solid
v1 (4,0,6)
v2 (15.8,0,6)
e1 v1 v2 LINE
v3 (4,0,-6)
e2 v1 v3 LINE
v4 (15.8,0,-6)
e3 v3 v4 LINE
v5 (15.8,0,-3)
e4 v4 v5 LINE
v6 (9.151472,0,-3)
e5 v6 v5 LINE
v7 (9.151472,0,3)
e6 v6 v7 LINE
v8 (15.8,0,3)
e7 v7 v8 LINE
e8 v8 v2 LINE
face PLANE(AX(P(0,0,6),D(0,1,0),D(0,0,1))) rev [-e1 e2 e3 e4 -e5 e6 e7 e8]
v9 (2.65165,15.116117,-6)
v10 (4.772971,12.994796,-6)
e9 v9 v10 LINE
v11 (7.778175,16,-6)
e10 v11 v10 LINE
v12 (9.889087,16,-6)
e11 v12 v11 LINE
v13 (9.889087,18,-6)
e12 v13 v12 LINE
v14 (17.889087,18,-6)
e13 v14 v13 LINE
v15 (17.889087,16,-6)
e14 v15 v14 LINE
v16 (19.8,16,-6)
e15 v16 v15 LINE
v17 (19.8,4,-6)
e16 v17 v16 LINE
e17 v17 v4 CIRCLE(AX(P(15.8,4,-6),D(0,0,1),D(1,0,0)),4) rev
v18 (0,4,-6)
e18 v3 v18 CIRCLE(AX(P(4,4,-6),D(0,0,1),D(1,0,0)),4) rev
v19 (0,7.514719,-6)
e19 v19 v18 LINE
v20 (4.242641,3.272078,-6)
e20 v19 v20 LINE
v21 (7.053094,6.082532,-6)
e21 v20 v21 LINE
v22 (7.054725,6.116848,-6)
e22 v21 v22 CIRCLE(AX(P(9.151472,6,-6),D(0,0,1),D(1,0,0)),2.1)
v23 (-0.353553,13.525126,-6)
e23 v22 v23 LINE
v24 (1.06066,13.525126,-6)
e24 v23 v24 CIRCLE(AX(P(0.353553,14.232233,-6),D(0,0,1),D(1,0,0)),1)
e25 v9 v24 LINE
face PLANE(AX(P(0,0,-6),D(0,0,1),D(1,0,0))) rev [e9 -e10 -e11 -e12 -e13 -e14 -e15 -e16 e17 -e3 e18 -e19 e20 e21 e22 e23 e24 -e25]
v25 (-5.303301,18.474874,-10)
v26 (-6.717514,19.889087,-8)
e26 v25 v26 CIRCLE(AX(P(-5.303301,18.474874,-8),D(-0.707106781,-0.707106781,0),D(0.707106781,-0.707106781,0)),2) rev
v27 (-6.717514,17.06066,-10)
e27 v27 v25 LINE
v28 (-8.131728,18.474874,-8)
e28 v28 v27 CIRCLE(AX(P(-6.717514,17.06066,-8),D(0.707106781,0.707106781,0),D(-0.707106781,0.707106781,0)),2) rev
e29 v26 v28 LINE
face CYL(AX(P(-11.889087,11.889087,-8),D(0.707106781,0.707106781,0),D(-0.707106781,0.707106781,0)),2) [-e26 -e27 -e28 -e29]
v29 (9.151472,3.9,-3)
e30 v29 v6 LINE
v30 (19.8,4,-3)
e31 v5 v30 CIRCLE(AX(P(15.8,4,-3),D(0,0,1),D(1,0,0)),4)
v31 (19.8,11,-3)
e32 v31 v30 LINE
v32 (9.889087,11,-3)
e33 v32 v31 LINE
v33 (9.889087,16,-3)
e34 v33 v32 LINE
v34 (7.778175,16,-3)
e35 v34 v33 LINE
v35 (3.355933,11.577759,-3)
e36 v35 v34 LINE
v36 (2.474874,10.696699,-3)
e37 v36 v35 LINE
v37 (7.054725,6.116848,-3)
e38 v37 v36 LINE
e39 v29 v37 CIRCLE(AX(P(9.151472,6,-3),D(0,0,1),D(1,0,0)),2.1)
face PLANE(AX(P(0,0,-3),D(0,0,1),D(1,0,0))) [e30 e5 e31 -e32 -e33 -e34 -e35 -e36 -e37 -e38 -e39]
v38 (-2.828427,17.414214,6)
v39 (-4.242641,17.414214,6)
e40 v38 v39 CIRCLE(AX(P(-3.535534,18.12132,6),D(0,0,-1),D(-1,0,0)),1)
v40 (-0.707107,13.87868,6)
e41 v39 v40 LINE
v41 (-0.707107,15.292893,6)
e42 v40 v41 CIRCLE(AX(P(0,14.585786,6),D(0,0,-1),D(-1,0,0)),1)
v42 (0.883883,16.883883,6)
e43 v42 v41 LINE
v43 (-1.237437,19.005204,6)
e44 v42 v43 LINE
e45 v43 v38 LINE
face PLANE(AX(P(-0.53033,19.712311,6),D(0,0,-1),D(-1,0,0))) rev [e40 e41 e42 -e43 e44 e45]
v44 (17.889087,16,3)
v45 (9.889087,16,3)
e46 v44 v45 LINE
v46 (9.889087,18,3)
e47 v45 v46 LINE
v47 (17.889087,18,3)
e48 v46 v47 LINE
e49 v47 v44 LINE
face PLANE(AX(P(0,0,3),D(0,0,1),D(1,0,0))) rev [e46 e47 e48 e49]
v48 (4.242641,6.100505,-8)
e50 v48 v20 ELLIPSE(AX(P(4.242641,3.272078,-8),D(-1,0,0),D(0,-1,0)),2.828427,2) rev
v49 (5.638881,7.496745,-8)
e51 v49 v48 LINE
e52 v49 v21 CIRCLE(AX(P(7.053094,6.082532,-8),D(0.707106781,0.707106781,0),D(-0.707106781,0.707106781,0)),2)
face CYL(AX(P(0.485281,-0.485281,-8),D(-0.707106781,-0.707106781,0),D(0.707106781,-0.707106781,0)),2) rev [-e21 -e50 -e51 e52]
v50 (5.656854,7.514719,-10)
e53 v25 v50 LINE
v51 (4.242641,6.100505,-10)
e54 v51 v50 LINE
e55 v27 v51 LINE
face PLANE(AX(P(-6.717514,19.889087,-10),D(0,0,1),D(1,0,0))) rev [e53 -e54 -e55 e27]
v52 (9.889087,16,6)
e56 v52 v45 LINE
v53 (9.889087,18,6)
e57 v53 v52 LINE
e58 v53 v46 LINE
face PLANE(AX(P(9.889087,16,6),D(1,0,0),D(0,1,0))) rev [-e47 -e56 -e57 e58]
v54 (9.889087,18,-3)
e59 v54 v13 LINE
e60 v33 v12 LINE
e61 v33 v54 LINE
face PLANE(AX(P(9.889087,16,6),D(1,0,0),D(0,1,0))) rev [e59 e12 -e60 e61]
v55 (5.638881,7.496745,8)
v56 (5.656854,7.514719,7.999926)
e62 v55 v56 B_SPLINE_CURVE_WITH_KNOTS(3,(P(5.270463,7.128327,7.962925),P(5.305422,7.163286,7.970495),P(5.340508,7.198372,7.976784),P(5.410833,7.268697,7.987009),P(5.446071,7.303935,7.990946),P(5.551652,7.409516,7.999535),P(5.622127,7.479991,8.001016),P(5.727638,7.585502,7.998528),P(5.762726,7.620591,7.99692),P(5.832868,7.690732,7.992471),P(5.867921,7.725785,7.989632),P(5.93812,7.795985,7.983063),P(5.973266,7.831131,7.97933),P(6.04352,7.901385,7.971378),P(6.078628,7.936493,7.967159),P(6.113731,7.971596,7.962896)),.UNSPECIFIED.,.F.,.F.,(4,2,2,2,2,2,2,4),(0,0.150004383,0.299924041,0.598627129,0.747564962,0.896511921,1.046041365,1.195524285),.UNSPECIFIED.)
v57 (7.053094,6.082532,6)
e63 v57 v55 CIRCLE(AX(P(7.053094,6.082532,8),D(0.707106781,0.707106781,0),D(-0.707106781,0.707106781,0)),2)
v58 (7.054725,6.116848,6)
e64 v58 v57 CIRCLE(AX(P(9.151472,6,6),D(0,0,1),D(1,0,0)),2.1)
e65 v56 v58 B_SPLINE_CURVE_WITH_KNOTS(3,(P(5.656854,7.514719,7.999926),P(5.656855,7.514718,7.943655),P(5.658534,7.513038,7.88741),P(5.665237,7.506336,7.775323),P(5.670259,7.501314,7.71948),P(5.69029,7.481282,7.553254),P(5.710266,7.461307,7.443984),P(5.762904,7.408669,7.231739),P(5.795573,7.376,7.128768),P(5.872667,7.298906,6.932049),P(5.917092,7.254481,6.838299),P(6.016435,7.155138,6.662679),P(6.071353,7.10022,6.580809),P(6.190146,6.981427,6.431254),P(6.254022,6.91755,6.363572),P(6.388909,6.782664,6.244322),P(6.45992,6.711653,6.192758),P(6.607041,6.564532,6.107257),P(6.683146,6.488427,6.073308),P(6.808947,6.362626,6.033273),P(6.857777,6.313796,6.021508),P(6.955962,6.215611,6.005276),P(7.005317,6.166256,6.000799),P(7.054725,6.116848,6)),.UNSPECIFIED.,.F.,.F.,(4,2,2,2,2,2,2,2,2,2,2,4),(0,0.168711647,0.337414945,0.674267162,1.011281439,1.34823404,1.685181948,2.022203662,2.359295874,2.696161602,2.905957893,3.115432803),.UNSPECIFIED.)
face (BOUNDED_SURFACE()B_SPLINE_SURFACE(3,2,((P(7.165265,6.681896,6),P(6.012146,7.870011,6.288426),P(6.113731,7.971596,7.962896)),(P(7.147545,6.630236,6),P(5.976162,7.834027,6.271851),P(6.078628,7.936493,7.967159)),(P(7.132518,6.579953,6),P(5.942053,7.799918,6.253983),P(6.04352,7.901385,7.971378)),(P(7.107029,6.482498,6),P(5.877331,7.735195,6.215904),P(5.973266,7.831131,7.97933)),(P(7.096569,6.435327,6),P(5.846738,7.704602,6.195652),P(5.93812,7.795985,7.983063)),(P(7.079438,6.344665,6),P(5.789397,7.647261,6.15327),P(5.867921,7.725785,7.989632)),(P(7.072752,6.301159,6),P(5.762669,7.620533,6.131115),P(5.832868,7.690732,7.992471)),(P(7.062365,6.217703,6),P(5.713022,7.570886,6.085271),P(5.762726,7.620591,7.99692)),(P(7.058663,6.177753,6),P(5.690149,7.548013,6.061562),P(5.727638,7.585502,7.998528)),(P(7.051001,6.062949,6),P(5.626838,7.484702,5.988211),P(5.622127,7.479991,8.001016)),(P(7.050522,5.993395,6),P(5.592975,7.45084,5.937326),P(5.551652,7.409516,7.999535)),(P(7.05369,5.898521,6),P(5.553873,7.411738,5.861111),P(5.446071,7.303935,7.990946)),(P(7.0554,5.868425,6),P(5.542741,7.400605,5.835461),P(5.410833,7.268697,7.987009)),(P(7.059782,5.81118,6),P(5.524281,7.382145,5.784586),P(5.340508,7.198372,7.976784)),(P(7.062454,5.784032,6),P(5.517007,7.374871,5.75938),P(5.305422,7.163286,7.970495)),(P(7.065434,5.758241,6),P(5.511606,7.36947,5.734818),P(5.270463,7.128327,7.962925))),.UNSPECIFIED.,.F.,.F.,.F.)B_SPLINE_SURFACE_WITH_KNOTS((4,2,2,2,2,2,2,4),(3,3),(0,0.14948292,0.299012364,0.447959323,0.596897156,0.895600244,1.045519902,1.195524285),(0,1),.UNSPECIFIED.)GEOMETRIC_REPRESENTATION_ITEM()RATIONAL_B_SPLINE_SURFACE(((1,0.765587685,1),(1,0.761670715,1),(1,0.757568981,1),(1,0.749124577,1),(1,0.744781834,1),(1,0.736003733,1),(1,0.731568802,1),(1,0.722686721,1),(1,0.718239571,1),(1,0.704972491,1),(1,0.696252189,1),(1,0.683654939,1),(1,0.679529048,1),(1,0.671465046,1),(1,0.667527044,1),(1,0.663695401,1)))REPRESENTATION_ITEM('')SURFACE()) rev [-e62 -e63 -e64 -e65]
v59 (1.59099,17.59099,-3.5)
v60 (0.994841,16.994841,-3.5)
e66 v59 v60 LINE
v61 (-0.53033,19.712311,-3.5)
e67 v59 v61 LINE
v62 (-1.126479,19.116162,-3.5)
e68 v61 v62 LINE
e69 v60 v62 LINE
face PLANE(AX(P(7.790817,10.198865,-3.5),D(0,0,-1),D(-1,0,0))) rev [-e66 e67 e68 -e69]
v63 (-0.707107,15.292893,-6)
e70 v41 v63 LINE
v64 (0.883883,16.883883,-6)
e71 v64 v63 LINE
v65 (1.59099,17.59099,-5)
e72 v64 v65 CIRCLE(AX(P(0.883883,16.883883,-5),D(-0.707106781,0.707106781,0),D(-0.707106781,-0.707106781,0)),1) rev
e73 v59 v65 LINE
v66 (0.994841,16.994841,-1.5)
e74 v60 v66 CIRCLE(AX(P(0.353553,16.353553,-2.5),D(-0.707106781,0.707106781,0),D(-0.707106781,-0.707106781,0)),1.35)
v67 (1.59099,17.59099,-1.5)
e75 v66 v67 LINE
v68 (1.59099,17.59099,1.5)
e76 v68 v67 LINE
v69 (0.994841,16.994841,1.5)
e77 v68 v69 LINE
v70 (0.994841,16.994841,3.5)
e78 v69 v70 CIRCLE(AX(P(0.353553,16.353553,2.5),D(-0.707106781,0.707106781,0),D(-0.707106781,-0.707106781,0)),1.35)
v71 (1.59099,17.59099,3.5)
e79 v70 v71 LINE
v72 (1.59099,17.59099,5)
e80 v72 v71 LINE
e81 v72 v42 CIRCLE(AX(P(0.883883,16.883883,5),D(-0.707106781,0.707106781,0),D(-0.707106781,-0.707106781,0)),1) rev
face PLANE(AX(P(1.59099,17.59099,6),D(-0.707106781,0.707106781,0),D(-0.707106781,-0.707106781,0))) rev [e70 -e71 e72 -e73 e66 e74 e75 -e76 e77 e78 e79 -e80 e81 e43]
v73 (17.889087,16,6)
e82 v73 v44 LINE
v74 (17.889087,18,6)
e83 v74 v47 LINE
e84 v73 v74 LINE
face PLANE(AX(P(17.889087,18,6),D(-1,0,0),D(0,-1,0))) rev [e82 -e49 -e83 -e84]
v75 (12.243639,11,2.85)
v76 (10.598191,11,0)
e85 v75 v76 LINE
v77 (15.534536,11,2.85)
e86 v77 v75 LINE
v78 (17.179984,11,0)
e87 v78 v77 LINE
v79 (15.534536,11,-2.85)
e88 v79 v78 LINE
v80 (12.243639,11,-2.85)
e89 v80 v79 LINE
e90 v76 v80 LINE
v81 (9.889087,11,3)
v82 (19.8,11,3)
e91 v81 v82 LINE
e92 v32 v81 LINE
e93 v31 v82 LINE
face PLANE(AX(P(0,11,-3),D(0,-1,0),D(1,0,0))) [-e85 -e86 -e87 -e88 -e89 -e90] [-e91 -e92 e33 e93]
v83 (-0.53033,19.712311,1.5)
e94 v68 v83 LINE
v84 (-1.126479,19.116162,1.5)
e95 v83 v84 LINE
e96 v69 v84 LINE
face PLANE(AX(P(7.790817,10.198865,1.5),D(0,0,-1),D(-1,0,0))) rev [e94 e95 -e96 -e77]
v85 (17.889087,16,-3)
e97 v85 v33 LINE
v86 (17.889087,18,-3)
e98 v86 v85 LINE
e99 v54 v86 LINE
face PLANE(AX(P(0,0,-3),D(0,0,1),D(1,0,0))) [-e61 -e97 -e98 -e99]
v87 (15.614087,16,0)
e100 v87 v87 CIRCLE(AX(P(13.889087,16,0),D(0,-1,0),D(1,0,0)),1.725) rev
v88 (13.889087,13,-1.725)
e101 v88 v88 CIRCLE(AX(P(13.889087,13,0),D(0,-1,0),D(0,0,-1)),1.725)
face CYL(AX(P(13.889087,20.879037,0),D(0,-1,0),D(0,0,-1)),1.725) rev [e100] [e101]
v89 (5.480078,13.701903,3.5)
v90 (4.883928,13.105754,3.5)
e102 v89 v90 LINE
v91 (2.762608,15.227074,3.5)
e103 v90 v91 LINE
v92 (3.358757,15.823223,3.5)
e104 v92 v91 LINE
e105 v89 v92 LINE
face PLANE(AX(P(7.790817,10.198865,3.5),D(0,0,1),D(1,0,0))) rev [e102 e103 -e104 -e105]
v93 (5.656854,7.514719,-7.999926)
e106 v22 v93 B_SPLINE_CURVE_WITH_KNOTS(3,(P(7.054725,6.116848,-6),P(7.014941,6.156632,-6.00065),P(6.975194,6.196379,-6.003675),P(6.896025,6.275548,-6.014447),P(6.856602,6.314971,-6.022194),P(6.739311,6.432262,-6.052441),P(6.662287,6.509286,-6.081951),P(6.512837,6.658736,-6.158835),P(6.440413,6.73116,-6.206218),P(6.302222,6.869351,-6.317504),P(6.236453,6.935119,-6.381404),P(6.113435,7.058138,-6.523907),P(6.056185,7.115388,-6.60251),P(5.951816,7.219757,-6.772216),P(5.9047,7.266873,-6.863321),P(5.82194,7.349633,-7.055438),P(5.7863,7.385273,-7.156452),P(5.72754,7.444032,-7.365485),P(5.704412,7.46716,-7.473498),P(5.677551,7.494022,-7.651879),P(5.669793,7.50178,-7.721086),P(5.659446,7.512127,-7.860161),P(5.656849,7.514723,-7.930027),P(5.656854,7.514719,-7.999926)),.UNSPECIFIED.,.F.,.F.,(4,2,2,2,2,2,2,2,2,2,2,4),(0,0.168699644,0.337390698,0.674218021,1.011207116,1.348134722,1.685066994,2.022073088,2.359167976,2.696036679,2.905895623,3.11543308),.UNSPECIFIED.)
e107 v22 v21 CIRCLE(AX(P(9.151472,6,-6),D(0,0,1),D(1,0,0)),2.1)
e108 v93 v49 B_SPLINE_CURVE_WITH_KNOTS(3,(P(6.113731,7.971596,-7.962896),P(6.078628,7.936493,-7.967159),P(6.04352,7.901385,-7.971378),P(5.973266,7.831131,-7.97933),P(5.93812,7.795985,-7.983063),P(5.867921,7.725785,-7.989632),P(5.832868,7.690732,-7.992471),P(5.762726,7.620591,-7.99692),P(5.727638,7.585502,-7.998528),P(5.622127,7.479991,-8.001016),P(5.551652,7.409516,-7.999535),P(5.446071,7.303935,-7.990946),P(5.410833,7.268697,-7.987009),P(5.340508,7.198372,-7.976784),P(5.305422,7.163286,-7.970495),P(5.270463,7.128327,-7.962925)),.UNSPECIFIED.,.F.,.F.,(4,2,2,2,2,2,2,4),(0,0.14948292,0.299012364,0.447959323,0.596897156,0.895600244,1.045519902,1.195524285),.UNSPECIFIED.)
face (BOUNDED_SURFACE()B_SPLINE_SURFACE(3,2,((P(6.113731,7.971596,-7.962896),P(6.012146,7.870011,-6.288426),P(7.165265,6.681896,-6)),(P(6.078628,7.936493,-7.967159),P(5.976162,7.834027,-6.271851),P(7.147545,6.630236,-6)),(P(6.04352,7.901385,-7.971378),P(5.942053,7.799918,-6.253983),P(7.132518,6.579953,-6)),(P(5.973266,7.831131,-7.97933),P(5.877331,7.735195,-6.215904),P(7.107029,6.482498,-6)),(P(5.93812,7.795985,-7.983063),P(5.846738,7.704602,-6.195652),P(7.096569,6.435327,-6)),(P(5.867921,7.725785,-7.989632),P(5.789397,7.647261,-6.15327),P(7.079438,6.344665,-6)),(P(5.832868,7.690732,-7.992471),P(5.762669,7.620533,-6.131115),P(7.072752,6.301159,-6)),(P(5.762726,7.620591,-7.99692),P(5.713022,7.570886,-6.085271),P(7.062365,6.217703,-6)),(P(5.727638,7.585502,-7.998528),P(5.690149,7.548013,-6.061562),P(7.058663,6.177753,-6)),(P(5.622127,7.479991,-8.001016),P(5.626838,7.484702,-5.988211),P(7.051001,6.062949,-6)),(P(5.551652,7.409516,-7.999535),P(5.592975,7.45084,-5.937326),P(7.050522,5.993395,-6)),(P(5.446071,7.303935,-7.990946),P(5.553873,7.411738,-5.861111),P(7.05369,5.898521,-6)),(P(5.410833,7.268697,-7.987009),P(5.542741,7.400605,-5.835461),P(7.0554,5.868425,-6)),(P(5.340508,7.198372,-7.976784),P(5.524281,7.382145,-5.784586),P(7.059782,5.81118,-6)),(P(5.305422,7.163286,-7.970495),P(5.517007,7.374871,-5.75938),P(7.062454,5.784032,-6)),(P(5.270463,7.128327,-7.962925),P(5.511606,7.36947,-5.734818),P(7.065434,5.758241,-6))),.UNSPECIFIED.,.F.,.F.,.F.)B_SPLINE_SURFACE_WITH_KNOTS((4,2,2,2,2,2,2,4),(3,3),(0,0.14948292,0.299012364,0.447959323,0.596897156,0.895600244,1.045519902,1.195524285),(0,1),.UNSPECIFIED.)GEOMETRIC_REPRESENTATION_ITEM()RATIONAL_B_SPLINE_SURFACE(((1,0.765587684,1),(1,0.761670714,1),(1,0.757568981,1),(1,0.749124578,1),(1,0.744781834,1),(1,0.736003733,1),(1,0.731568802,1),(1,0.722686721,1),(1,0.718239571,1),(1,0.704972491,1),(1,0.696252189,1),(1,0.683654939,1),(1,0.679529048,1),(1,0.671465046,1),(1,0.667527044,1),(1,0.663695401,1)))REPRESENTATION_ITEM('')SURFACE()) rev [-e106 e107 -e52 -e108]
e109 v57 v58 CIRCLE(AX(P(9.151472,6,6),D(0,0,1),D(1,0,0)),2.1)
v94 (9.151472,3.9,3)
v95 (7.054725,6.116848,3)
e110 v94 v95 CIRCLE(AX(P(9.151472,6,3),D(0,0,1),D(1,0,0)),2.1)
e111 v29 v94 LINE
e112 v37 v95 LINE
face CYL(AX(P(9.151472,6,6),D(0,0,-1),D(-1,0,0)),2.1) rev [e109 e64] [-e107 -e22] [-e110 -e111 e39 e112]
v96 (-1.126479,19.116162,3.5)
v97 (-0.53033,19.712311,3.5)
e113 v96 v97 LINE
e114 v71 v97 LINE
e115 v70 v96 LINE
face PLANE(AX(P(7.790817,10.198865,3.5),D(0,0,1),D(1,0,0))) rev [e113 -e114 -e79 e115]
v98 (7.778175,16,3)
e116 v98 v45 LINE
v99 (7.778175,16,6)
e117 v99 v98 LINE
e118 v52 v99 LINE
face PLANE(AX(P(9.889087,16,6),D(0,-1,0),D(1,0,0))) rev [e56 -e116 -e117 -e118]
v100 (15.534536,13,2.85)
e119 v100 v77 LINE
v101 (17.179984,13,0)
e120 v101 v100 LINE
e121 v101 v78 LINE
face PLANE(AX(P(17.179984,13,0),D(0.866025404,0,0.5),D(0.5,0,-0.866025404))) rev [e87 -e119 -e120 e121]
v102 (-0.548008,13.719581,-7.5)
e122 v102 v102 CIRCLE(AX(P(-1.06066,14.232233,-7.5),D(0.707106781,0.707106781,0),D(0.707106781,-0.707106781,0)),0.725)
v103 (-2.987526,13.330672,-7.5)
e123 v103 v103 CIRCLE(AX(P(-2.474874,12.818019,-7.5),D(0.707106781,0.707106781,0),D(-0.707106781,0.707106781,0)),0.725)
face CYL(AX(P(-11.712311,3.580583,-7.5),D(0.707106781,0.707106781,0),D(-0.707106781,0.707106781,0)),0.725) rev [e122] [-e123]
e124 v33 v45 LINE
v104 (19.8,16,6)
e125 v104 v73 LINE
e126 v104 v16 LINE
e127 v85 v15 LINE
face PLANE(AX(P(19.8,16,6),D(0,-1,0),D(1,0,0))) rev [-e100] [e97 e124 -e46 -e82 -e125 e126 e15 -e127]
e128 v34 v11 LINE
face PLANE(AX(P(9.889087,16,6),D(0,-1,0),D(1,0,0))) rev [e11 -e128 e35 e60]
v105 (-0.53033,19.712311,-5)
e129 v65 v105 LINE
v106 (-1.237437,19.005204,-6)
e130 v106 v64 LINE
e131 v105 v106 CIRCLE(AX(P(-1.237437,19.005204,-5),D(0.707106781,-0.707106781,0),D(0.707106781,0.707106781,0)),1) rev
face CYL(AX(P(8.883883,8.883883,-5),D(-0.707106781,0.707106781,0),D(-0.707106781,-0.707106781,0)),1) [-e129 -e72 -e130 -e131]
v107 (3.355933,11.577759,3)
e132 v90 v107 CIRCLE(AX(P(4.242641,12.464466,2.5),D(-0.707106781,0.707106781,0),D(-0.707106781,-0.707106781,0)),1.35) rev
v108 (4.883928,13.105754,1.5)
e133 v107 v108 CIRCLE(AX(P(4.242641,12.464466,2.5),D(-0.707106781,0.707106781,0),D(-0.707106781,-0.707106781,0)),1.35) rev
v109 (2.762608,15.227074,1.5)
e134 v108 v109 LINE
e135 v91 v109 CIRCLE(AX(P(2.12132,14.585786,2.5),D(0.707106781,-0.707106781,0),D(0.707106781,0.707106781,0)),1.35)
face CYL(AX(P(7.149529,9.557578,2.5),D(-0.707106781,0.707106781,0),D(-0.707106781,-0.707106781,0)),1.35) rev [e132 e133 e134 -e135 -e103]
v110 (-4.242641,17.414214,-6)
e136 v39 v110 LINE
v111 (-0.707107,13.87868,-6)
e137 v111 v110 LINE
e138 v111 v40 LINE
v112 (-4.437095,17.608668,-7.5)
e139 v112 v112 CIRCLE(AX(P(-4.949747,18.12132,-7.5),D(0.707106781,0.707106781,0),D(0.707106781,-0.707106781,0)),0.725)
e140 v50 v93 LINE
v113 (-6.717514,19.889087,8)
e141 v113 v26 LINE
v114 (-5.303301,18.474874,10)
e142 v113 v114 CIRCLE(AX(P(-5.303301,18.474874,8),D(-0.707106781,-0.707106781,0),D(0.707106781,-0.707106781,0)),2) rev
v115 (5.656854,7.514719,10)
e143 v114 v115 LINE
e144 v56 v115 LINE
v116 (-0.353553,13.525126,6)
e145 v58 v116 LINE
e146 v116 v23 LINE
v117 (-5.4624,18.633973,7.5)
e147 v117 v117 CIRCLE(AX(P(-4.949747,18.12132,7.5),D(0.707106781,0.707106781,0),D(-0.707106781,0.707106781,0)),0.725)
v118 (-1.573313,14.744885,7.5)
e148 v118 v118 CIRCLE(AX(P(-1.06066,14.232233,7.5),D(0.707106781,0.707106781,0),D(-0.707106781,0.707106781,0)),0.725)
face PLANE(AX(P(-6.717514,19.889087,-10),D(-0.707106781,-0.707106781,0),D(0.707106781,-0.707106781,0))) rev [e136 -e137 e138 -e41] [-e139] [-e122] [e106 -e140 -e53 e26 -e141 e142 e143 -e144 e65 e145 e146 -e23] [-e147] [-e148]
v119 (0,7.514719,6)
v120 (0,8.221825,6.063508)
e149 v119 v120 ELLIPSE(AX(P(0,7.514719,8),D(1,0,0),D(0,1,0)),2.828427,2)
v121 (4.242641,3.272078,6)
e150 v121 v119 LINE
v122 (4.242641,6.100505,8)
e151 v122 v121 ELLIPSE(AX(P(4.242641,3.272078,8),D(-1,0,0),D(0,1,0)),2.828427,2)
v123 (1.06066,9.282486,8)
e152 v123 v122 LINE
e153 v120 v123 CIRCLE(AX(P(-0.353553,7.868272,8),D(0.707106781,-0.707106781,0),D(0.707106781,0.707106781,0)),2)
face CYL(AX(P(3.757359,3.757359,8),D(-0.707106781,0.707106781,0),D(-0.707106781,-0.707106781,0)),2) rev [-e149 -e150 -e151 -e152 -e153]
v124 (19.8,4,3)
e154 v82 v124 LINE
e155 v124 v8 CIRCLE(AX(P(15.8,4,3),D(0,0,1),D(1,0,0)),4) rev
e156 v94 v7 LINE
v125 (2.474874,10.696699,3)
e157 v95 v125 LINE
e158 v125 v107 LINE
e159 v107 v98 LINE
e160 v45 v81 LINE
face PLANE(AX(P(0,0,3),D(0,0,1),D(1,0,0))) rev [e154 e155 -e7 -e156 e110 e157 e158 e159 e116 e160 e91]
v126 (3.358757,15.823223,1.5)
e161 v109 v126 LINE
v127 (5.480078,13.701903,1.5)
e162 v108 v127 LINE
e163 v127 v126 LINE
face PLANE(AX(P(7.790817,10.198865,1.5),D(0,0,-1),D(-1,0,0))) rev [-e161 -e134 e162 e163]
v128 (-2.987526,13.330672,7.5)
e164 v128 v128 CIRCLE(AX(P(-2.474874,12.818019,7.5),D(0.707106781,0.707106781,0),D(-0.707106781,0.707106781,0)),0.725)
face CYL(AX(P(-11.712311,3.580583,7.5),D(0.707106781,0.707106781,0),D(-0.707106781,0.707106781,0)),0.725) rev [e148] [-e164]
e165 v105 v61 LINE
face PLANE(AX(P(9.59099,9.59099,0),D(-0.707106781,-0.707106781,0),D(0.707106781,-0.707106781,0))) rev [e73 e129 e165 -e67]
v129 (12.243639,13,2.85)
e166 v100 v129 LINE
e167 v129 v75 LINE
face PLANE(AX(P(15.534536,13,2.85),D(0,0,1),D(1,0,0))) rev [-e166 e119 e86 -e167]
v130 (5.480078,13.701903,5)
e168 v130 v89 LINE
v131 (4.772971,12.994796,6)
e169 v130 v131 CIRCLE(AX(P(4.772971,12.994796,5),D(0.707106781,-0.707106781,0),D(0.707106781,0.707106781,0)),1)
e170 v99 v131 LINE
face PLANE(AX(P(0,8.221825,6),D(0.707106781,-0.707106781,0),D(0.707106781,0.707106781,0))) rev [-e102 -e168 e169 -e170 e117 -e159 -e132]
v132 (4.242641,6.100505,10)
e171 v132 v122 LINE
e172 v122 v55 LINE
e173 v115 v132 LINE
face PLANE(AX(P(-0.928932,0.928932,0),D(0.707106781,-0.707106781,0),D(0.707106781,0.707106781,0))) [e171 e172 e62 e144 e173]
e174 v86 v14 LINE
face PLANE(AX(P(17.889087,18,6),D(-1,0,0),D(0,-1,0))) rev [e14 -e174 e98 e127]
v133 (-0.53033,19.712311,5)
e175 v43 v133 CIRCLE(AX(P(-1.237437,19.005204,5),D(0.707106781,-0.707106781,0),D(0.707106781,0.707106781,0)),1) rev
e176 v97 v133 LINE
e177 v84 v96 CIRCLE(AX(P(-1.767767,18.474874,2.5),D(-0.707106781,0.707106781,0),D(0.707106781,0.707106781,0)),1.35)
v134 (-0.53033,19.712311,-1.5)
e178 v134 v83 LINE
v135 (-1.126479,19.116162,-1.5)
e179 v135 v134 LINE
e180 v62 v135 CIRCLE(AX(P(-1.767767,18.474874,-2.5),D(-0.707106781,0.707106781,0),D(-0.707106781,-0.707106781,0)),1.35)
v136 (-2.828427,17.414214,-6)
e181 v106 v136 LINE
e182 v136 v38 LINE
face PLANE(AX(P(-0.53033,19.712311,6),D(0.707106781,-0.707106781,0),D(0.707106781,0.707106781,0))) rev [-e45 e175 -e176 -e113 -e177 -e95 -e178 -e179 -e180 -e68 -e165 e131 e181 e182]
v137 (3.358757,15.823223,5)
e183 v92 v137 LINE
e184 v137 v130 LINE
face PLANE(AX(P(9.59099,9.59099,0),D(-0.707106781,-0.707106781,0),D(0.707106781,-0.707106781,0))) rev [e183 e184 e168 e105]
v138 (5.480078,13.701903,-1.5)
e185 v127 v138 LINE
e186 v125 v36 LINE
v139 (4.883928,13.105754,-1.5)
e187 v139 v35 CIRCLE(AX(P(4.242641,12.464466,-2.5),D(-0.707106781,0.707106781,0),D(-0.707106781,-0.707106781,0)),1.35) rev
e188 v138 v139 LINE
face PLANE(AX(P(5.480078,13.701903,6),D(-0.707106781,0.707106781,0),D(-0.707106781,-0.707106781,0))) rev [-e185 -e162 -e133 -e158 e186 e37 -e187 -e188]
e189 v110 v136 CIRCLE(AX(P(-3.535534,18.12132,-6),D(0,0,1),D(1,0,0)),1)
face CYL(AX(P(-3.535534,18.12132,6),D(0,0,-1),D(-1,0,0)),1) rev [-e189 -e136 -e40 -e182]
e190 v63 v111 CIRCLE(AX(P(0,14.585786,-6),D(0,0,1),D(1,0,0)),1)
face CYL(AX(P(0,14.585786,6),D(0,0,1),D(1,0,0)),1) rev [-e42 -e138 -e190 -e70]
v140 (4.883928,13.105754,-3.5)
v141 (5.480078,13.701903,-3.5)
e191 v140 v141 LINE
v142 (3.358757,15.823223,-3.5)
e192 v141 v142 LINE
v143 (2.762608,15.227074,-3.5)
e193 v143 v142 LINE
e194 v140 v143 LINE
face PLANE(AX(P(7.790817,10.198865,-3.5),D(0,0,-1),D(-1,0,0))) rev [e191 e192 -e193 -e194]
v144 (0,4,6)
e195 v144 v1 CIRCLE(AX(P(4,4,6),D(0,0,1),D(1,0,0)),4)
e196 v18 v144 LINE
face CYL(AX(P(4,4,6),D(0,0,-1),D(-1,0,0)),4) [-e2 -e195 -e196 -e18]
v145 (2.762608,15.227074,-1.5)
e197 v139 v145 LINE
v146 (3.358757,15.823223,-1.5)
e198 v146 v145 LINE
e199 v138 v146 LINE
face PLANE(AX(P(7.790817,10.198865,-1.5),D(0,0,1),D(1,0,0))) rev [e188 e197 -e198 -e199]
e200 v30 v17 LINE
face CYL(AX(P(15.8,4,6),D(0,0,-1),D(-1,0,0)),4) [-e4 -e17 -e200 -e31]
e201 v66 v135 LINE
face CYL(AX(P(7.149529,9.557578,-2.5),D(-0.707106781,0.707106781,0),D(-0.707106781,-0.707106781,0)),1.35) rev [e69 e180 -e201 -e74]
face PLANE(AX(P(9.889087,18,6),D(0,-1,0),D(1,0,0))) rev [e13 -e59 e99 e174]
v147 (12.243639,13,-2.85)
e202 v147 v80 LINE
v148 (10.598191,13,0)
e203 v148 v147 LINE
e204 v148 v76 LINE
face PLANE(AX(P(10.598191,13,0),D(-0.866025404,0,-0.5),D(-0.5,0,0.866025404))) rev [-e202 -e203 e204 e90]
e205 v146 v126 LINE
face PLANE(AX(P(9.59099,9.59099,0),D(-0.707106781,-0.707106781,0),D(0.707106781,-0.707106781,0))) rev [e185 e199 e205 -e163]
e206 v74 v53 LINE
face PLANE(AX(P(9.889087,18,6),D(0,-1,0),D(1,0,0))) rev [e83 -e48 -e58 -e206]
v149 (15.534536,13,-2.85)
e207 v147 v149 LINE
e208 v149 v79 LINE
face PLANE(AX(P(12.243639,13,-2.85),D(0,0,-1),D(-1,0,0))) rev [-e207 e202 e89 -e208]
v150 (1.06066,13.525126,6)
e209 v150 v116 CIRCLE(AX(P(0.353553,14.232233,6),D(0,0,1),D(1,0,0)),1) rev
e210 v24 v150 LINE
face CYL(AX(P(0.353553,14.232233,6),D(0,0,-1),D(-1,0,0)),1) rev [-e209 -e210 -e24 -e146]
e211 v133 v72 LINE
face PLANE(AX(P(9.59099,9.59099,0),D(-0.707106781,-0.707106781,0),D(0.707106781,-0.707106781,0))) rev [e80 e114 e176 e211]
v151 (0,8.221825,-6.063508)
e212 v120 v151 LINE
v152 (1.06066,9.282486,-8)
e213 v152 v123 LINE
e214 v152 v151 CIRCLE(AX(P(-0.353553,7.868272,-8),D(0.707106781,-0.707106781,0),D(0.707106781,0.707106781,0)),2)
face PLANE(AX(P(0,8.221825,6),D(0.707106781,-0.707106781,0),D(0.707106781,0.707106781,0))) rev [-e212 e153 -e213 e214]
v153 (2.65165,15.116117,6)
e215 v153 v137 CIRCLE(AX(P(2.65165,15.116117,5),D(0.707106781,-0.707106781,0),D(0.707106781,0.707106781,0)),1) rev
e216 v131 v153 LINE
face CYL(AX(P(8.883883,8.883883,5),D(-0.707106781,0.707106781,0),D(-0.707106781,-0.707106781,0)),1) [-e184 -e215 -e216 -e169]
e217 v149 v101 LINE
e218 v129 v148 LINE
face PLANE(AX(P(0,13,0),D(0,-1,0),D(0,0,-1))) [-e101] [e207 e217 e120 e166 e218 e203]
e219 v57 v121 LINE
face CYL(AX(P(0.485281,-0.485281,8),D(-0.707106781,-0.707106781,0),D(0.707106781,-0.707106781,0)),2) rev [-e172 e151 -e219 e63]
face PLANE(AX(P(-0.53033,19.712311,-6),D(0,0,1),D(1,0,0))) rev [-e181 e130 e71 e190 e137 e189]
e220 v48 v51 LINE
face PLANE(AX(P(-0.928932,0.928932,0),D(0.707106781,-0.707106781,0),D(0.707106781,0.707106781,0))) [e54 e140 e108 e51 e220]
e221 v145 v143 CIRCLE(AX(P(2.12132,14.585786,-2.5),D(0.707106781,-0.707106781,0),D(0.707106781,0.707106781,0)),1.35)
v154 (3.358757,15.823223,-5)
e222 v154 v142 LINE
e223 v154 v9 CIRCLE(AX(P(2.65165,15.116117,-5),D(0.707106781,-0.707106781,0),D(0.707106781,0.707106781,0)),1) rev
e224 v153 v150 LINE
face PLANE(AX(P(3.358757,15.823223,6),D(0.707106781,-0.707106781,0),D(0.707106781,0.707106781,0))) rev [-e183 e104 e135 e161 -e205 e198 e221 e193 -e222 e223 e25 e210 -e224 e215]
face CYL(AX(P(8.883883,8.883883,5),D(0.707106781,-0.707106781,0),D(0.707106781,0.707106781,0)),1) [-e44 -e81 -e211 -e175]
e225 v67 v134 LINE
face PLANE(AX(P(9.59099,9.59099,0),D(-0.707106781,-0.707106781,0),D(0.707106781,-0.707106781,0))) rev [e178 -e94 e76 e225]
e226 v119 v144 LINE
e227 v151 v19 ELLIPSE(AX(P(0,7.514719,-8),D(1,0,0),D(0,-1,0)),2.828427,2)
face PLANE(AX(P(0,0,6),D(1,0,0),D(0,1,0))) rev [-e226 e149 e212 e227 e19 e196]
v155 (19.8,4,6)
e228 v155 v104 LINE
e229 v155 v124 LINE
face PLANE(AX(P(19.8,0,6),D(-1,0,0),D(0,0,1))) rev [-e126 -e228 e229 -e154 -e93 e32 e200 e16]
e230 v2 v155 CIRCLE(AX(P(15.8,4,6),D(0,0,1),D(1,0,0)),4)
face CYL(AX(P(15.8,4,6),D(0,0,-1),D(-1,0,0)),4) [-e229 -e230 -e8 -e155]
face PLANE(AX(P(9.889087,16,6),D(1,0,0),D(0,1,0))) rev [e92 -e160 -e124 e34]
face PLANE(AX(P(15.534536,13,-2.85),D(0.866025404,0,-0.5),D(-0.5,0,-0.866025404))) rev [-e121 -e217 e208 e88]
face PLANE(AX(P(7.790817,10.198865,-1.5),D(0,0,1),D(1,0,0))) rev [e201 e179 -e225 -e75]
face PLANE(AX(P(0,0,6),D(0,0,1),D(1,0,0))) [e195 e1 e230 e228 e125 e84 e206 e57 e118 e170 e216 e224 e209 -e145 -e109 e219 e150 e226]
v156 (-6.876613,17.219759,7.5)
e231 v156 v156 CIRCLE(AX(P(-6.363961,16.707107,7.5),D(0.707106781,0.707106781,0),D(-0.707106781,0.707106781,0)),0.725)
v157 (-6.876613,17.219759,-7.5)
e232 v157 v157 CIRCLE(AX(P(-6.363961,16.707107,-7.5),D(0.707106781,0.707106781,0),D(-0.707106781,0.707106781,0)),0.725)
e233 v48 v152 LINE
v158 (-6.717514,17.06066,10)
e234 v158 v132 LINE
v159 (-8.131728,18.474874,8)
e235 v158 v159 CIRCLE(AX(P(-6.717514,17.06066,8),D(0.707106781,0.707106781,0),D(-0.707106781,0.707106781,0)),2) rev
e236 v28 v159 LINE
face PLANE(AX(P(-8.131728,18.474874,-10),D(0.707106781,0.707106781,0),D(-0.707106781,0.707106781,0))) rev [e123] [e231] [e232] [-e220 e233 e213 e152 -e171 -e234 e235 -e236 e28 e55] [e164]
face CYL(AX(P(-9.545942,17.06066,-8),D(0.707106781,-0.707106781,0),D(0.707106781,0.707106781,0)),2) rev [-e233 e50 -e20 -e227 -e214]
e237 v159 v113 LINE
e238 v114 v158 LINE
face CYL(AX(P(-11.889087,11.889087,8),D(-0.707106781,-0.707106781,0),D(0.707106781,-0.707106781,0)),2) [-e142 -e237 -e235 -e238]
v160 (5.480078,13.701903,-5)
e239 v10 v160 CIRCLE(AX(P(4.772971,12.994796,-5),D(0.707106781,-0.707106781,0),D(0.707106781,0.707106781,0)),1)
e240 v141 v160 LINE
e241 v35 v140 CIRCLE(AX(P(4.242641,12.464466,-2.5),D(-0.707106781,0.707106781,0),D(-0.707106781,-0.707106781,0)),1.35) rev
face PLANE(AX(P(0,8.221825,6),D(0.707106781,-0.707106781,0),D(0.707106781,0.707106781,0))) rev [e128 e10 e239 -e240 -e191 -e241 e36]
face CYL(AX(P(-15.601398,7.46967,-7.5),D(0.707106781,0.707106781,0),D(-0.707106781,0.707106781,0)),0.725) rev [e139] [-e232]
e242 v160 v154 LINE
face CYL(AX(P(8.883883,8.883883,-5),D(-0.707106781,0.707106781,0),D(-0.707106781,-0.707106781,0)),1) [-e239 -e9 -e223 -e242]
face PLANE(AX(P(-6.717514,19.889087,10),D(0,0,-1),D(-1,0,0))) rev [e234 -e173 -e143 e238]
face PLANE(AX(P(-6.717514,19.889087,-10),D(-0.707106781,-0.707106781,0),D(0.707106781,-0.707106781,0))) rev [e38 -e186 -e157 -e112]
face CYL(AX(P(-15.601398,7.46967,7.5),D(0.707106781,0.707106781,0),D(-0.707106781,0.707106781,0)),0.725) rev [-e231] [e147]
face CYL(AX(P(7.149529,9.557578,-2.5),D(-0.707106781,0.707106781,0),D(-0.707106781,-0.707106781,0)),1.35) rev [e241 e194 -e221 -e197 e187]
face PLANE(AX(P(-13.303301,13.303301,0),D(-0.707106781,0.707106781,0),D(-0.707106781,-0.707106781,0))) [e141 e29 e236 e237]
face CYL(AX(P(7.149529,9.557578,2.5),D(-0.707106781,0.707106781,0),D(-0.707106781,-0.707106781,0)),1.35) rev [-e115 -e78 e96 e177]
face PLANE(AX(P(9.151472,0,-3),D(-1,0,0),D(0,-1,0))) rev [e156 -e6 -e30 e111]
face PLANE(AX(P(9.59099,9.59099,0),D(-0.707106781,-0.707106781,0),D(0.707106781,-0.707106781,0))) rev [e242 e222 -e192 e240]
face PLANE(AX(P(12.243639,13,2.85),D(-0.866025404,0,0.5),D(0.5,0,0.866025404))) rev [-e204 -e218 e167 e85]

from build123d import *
from build123d.topology import SkipClean

# Parameters (mm, degrees)
SKETCH1_R                        = 2.1
FINGER_BASE_1_DEPTH              = 6
SKETCH2_W                        = 20
SKETCH2_H                        = 2
FLEXURE_JOINT_BASE_DEPTH         = 13
SKETCH3_W                        = 8
SKETCH3_H                        = 2
PULLEY_HOUSING_DEPTH             = 3
M3_NUT_DEPTH                     = 2
SKETCH5_R                        = 1.725
M3_HOLE_DEPTH                    = 3
SKETCH9_W                        = 4
SKETCH9_H                        = 2
SUPPORT_FLEXURE_JOINT_BASE_DEPTH = 4.5
SKETCH10_R                       = 0.725
HOLE_FOR_STICHING_DEPTH          = 23.216728933
SKETCH11_W                       = 3
SKETCH11_H                       = 12
TUBE_PLATE_DEPTH                 = 4.25
TUBE_HOUSING_REACH               = 35.132
FINGER_BASE_CONTOURING_R         = 1
FINGER_BASE_CONTOURING_R_2       = 2
FINGER_BASE_CONTOURING_R_3       = 4


with BuildPart() as part:
    # Sketch1 → Finger Base 1 (new, symmetric)
    with BuildSketch(Plane.XY):
        Polygon((0, 8.221825407), (7.778174593, 16), (9.889087297, 16), (9.889087297, 18), (17.889087297, 18), (17.889087297, 16), (19.8, 16), (19.8, 0), (0, 0), align=None)
        with Locations((9.151471863, 6)):
            Circle(SKETCH1_R, mode=Mode.SUBTRACT)
    extrude(amount=FINGER_BASE_1_DEPTH, both=True)

    # Sketch2 → Flexure Joint Base (add)
    with BuildSketch(Plane(origin=(-4.110912703, 4.110912703, 0), x_dir=(0, 0, 1), z_dir=(-0.7071067811865462, 0.707106781186549, 0))):
        with Locations((0, 8.313708499)):
            Rectangle(SKETCH2_W, SKETCH2_H)
    extrude(amount=FLEXURE_JOINT_BASE_DEPTH)

    # Sketch3 → Pulley Housing (cut, symmetric)
    with SkipClean():  # the faces are left unmerged after this step: merging them gives an invalid solid
        with BuildSketch(Plane.XY):
            with BuildLine():
                ThreePointArc((7.054725188, 6.116847687), (7.62579494, 4.556978889), (9.151471863, 3.9))
                Line((9.151471863, 3.9), (9.151471863, 0))
                Line((9.151471863, 0), (19.8, 0))
                Line((19.8, 0), (19.8, 11))
                Line((19.8, 11), (9.889087297, 11))
                Line((9.889087297, 11), (9.889087297, 16))
                Line((9.889087297, 16), (7.778174593, 16))
                Line((7.778174593, 16), (2.474873734, 10.696699141))
                Line((2.474873734, 10.696699141), (7.054725188, 6.116847687))
            make_face()
            with Locations((13.889087297, 17)):
                Rectangle(SKETCH3_W, SKETCH3_H)
        extrude(amount=PULLEY_HOUSING_DEPTH, both=True, mode=Mode.SUBTRACT)
    add(part.part.scale(1), mode=Mode.REPLACE)  # the faces are merged on a copy

    # Sketch4 → M3 Nut (cut)
    with BuildSketch(Plane.XZ.offset(-11)):
        Polygon((10.598190762, 0), (12.243639029, -2.85), (15.534535564, -2.85), (17.179983831, 0), (15.534535564, 2.85), (12.243639029, 2.85), align=None)
    extrude(amount=-M3_NUT_DEPTH, mode=Mode.SUBTRACT)

    # Sketch5 → M3 Hole (cut)
    with BuildSketch(Plane.XZ.offset(-13)):
        with Locations(Location((13.889087297, 0, 0), (0, 0, 270))):
            Circle(SKETCH5_R)
    extrude(amount=-M3_HOLE_DEPTH, mode=Mode.SUBTRACT)

    # Sketch9 → Support Flexure Joint Base (add)
    with BuildSketch(Plane(origin=(-4.110912703, 4.110912703, 0), x_dir=(0, 0, -1), z_dir=(0.7071067811865462, -0.7071067811865488, 0))):
        with Locations((-8, 8.313708499)):
            Rectangle(SKETCH9_W, SKETCH9_H)
        with Locations((8, 8.313708499)):
            Rectangle(SKETCH9_W, SKETCH9_H)
    extrude(amount=SUPPORT_FLEXURE_JOINT_BASE_DEPTH)

    # Sketch10 → Hole For Stiching (cut, through all)
    with BuildSketch(Plane(origin=(6.585786438, 6.585786438, 0), x_dir=(0.7071067811865462, -0.707106781186549, 0), z_dir=(0.707106781186549, 0.7071067811865462, 0))):
        with Locations(Location((-16.313708499, -7.5, 0), (0, 0, 180))):
            Circle(SKETCH10_R)
        with Locations(Location((-10.813708499, -7.5, 0), (0, 0, 180))):
            Circle(SKETCH10_R)
        with Locations(Location((-10.813708499, 7.5, 0), (0, 0, 180))):
            Circle(SKETCH10_R)
        with Locations(Location((-16.313708499, 7.5, 0), (0, 0, 180))):
            Circle(SKETCH10_R)
    extrude(amount=-HOLE_FOR_STICHING_DEPTH, mode=Mode.SUBTRACT)

    # Sketch11 → Tube Plate (add)
    with BuildSketch(Plane(origin=(6.585786438, 6.585786438, 0), x_dir=(0.7071067811865462, -0.707106781186549, 0), z_dir=(0.707106781186549, 0.7071067811865462, 0))):
        with Locations((-12.813708499, 0)):
            Rectangle(SKETCH11_W, SKETCH11_H)
        with Locations((-7.313708499, 0)):
            Rectangle(SKETCH11_W, SKETCH11_H)
    extrude(amount=TUBE_PLATE_DEPTH)

    # Tube Housing: up to this face of the body (flat: up to its plane)
    tube_housing_end = Plane(part.part.faces().sort_by_distance((3.977475644, 12.199301051, 0))[0])
    # Sketch12 → Tube Housing (cut, up to the picked face)
    with BuildSketch(Plane(origin=(-10.121320344, 10.121320344, 0), x_dir=(0, 0, 1), z_dir=(-0.7071067811865462, 0.707106781186549, 0)), mode=Mode.PRIVATE) as tube_housing_sk1:
        with BuildLine():
            Line((-3.5, 13.563708499), (-1.5, 13.563708499))
            Line((-1.5, 13.563708499), (-1.5, 12.720626356))
            ThreePointArc((-1.5, 12.720626356), (-2.5, 10.463708499), (-3.5, 12.720626356))
            Line((-3.5, 12.720626356), (-3.5, 13.563708499))
        make_face()
    tube_housing_tool1 = split(extrude(tube_housing_sk1.sketch, amount=-TUBE_HOUSING_REACH, mode=Mode.PRIVATE), bisect_by=tube_housing_end, keep=Keep.BOTH, mode=Mode.PRIVATE)
    # Sketch12 → Tube Housing (cut, up to the picked face)
    with BuildSketch(Plane(origin=(-10.121320344, 10.121320344, 0), x_dir=(0, 0, 1), z_dir=(-0.7071067811865462, 0.707106781186549, 0)), mode=Mode.PRIVATE) as tube_housing_sk2:
        with BuildLine():
            Line((1.5, 12.720626356), (1.5, 13.563708499))
            Line((1.5, 13.563708499), (3.5, 13.563708499))
            Line((3.5, 13.563708499), (3.5, 12.720626356))
            ThreePointArc((3.5, 12.720626356), (2.5, 10.463708499), (1.5, 12.720626356))
        make_face()
    tube_housing_tool2 = split(extrude(tube_housing_sk2.sketch, amount=-TUBE_HOUSING_REACH, mode=Mode.PRIVATE), bisect_by=tube_housing_end, keep=Keep.BOTH, mode=Mode.PRIVATE)
    add(tube_housing_tool1.solids().sort_by(Axis((-1.604122, 18.638518, -2.5), (0.7071067811865462, -0.707106781186549, 0)))[0], mode=Mode.SUBTRACT)
    add(tube_housing_tool2.solids().sort_by(Axis((-1.604122, 18.638518, 2.5), (0.7071067811865462, -0.707106781186549, 0)))[0], mode=Mode.SUBTRACT)

    # Finger Base Contouring
    # the kernel refuses this fillet: 4, 2, 1 mm, written as the material it adds along each edge
    with BuildSketch(Plane(origin=(-1.414213562, 14.585786438, 6), x_dir=(0.7071067811865426, -0.7071067811865525, 0), z_dir=(0, 0, -1)), Plane(origin=(-3.535533906, 16.707106781, -6), x_dir=(-0.7071067811865498, 0.7071067811865454, 0), z_dir=(0, 0, 1))) as finger_base_contouring_piece_1:
        with BuildLine():
            CenterArc((FINGER_BASE_CONTOURING_R, -FINGER_BASE_CONTOURING_R), FINGER_BASE_CONTOURING_R, 90, 90)
            Line((0, -FINGER_BASE_CONTOURING_R), (0, 0))
            Line((0, 0), (FINGER_BASE_CONTOURING_R, 0))
        make_face()
    extrude(amount=12)
    with BuildSketch(Plane(origin=(0.353553391, 12.818019485, -6), x_dir=(0.7071067811865487, 0.7071067811865465, 0), z_dir=(0, 0, 1))) as finger_base_contouring_piece_2:
        with BuildLine():
            CenterArc((FINGER_BASE_CONTOURING_R, FINGER_BASE_CONTOURING_R), FINGER_BASE_CONTOURING_R, 180, 90)
            Line((0, FINGER_BASE_CONTOURING_R), (0, 0))
            Line((0, 0), (FINGER_BASE_CONTOURING_R, 0))
        make_face()
    extrude(amount=12)
    with BuildSketch(Plane(origin=(1.060660172, 9.282485579, 6), x_dir=(0, 0, 1), z_dir=(0.7071067811865462, -0.7071067811865488, 0))) as finger_base_contouring_piece_3_section:
        with BuildLine():
            CenterArc((FINGER_BASE_CONTOURING_R_2, FINGER_BASE_CONTOURING_R_2), FINGER_BASE_CONTOURING_R_2, 180, 90)
            Line((0, FINGER_BASE_CONTOURING_R_2), (0, 0))
            Line((0, 0), (FINGER_BASE_CONTOURING_R_2, 0))
        make_face()
    finger_base_contouring_piece_3 = extrude(amount=4.5, mode=Mode.PRIVATE)
    finger_base_contouring_piece_3 = split(finger_base_contouring_piece_3, bisect_by=Plane(origin=(0, 9.282485579, 6), z_dir=(1, 0, 0)), keep=Keep.TOP, mode=Mode.PRIVATE)
    add(finger_base_contouring_piece_3)
    with BuildSketch(Plane(origin=(5.656854249, 7.514718626, 6), x_dir=(0, 0, 1), z_dir=(-0.7071067811865488, -0.7071067811865462, 0))) as finger_base_contouring_piece_4_section:
        with BuildLine():
            CenterArc((FINGER_BASE_CONTOURING_R_2, -FINGER_BASE_CONTOURING_R_2), FINGER_BASE_CONTOURING_R_2, 90, 90)
            Line((0, -FINGER_BASE_CONTOURING_R_2), (0, 0))
            Line((0, 0), (FINGER_BASE_CONTOURING_R_2, 0))
        make_face()
    finger_base_contouring_piece_4 = extrude(amount=2, mode=Mode.PRIVATE)
    finger_base_contouring_piece_4 = finger_base_contouring_piece_4 - Plane(origin=(9.151471863, 6, 6), x_dir=(1, 0, 0), z_dir=(0, 0, -1)) * Cylinder(2.1, 12, mode=Mode.PRIVATE)
    add(finger_base_contouring_piece_4)
    with BuildSketch(Plane(origin=(1.060660172, 9.282485579, -6), x_dir=(-0.7071067811865489, -0.7071067811865462, 0), z_dir=(0.7071067811865462, -0.7071067811865488, 0))) as finger_base_contouring_piece_5_section:
        with BuildLine():
            CenterArc((FINGER_BASE_CONTOURING_R_2, FINGER_BASE_CONTOURING_R_2), FINGER_BASE_CONTOURING_R_2, 180, 90)
            Line((0, FINGER_BASE_CONTOURING_R_2), (0, 0))
            Line((0, 0), (FINGER_BASE_CONTOURING_R_2, 0))
        make_face()
    finger_base_contouring_piece_5 = extrude(amount=4.5, mode=Mode.PRIVATE)
    finger_base_contouring_piece_5 = split(finger_base_contouring_piece_5, bisect_by=Plane(origin=(0, 9.282485579, -6), z_dir=(1, 0, 0)), keep=Keep.TOP, mode=Mode.PRIVATE)
    add(finger_base_contouring_piece_5)
    with BuildSketch(Plane(origin=(4.242640687, 6.100505063, -6), x_dir=(0.7071067811865464, -0.7071067811865488, 0), z_dir=(0.7071067811865488, 0.7071067811865462, 0))) as finger_base_contouring_piece_6_section:
        with BuildLine():
            CenterArc((FINGER_BASE_CONTOURING_R_2, FINGER_BASE_CONTOURING_R_2), FINGER_BASE_CONTOURING_R_2, 180, 90)
            Line((0, FINGER_BASE_CONTOURING_R_2), (0, 0))
            Line((0, 0), (FINGER_BASE_CONTOURING_R_2, 0))
        make_face()
    finger_base_contouring_piece_6 = extrude(amount=2, mode=Mode.PRIVATE)
    finger_base_contouring_piece_6 = finger_base_contouring_piece_6 - Plane(origin=(9.151471863, 6, -6), x_dir=(1, 0, 0), z_dir=(0, 0, -1)) * Cylinder(2.1, 13, mode=Mode.PRIVATE)
    add(finger_base_contouring_piece_6)
    with BuildSketch(Plane(origin=(5.656854249, 7.514718626, 6), x_dir=(0, 0, 1), z_dir=(-0.7071067811865488, -0.7071067811865462, 0))) as finger_base_contouring_piece_7a_section:
        with BuildLine():
            CenterArc((FINGER_BASE_CONTOURING_R_2, -FINGER_BASE_CONTOURING_R_2), FINGER_BASE_CONTOURING_R_2, 90, 90)
            Line((0, -FINGER_BASE_CONTOURING_R_2), (0, 0))
            Line((0, 0), (FINGER_BASE_CONTOURING_R_2, 0))
        make_face()
    finger_base_contouring_piece_7a = extrude(amount=7, mode=Mode.PRIVATE)
    finger_base_contouring_piece_7a = split(finger_base_contouring_piece_7a, bisect_by=Plane(origin=(4.242640687, 6.100505063, 6), z_dir=(-0.7071067811865489, -0.7071067811865461, 0)), keep=Keep.TOP, mode=Mode.PRIVATE)
    with BuildSketch(Plane(origin=(1.060660172, 9.282485579, 6), x_dir=(0, 0, 1), z_dir=(0.7071067811865462, -0.7071067811865488, 0))) as finger_base_contouring_piece_7b_section:
        with BuildLine():
            CenterArc((FINGER_BASE_CONTOURING_R_2, FINGER_BASE_CONTOURING_R_2), FINGER_BASE_CONTOURING_R_2, 180, 90)
            Line((0, FINGER_BASE_CONTOURING_R_2), (0, 0))
            Line((0, 0), (FINGER_BASE_CONTOURING_R_2, 0))
        make_face()
    finger_base_contouring_piece_7b = extrude(amount=9.5, mode=Mode.PRIVATE)
    finger_base_contouring_piece_7b = split(finger_base_contouring_piece_7b, bisect_by=Plane(origin=(4.242640687, 6.100505063, 6), z_dir=(0.7071067811865462, -0.7071067811865488, 0)), keep=Keep.TOP, mode=Mode.PRIVATE)
    finger_base_contouring_piece_7 = finger_base_contouring_piece_7a & finger_base_contouring_piece_7b
    add(finger_base_contouring_piece_7)
    with BuildSketch(Plane(origin=(1.060660172, 9.282485579, -6), x_dir=(-0.7071067811865489, -0.7071067811865462, 0), z_dir=(0.7071067811865462, -0.7071067811865488, 0))) as finger_base_contouring_piece_8a_section:
        with BuildLine():
            CenterArc((FINGER_BASE_CONTOURING_R_2, FINGER_BASE_CONTOURING_R_2), FINGER_BASE_CONTOURING_R_2, 180, 90)
            Line((0, FINGER_BASE_CONTOURING_R_2), (0, 0))
            Line((0, 0), (FINGER_BASE_CONTOURING_R_2, 0))
        make_face()
    finger_base_contouring_piece_8a = extrude(amount=9.5, mode=Mode.PRIVATE)
    finger_base_contouring_piece_8a = split(finger_base_contouring_piece_8a, bisect_by=Plane(origin=(4.242640687, 6.100505063, -6), z_dir=(0.7071067811865462, -0.7071067811865488, 0)), keep=Keep.TOP, mode=Mode.PRIVATE)
    with BuildSketch(Plane(origin=(0.707106781, 2.564971157, -6), x_dir=(0.7071067811865464, -0.7071067811865488, 0), z_dir=(0.7071067811865488, 0.7071067811865462, 0))) as finger_base_contouring_piece_8b_section:
        with BuildLine():
            CenterArc((FINGER_BASE_CONTOURING_R_2, FINGER_BASE_CONTOURING_R_2), FINGER_BASE_CONTOURING_R_2, 180, 90)
            Line((0, FINGER_BASE_CONTOURING_R_2), (0, 0))
            Line((0, 0), (FINGER_BASE_CONTOURING_R_2, 0))
        make_face()
    finger_base_contouring_piece_8b = extrude(amount=7, mode=Mode.PRIVATE)
    finger_base_contouring_piece_8b = split(finger_base_contouring_piece_8b, bisect_by=Plane(origin=(4.242640687, 6.100505063, -6), z_dir=(-0.7071067811865489, -0.7071067811865461, 0)), keep=Keep.TOP, mode=Mode.PRIVATE)
    finger_base_contouring_piece_8 = finger_base_contouring_piece_8a & finger_base_contouring_piece_8b
    add(finger_base_contouring_piece_8)
    # the kernel refuses this fillet: 4, 2, 1 mm, written as the material it takes off along each edge
    with BuildSketch(Plane(origin=(3.358757211, 15.823223305, -6), x_dir=(0, 0, 1), z_dir=(-0.7071067811865462, 0.707106781186549, 0))) as finger_base_contouring_2_piece_1:
        with BuildLine():
            CenterArc((FINGER_BASE_CONTOURING_R, -FINGER_BASE_CONTOURING_R), FINGER_BASE_CONTOURING_R, 90, 90)
            Line((0, -FINGER_BASE_CONTOURING_R), (0, 0))
            Line((0, 0), (FINGER_BASE_CONTOURING_R, 0))
        make_face()
    extrude(amount=8, mode=Mode.SUBTRACT)
    with BuildSketch(Plane(origin=(-2.298097039, 21.480077554, 6), x_dir=(-0.707106781186549, -0.7071067811865461, 0), z_dir=(0.7071067811865462, -0.707106781186549, 0))) as finger_base_contouring_2_piece_2:
        with BuildLine():
            CenterArc((FINGER_BASE_CONTOURING_R, FINGER_BASE_CONTOURING_R), FINGER_BASE_CONTOURING_R, 180, 90)
            Line((0, FINGER_BASE_CONTOURING_R), (0, 0))
            Line((0, 0), (FINGER_BASE_CONTOURING_R, 0))
        make_face()
    extrude(amount=8, mode=Mode.SUBTRACT)
    with BuildSketch(Plane(origin=(5.480077554, 13.701902961, -6), x_dir=(-0.7071067811865489, -0.7071067811865462, -1.776356839400251e-15), z_dir=(-0.7071067811865462, 0.707106781186549, 0)), Plane(origin=(1.590990258, 17.590990258, 6), x_dir=(-0.7071067811865489, -0.7071067811865462, -1.776356839400251e-15), z_dir=(0.7071067811865462, -0.707106781186549, 0))) as finger_base_contouring_2_piece_3:
        with BuildLine():
            CenterArc((FINGER_BASE_CONTOURING_R, FINGER_BASE_CONTOURING_R), FINGER_BASE_CONTOURING_R, 180, 90)
            Line((0, FINGER_BASE_CONTOURING_R), (0, 0))
            Line((0, 0), (FINGER_BASE_CONTOURING_R, 0))
        make_face()
    extrude(amount=5.5, mode=Mode.SUBTRACT)
    with BuildSketch(Plane(origin=(-3.181980515, 23.424621202, 10), x_dir=(0, 0, -1), z_dir=(-0.707106781186549, -0.7071067811865462, -1.7763568394002497e-15))) as finger_base_contouring_2_piece_4:
        with BuildLine():
            CenterArc((FINGER_BASE_CONTOURING_R_2, FINGER_BASE_CONTOURING_R_2), FINGER_BASE_CONTOURING_R_2, 180, 90)
            Line((0, FINGER_BASE_CONTOURING_R_2), (0, 0))
            Line((0, 0), (FINGER_BASE_CONTOURING_R_2, 0))
        make_face()
    extrude(amount=12, mode=Mode.SUBTRACT)
    with BuildSketch(Plane(origin=(-11.66726189, 14.939339828, -10), x_dir=(0.707106781186546, -0.7071067811865489, 0), z_dir=(0.707106781186549, 0.7071067811865462, 0))) as finger_base_contouring_2_piece_5:
        with BuildLine():
            CenterArc((FINGER_BASE_CONTOURING_R_2, -FINGER_BASE_CONTOURING_R_2), FINGER_BASE_CONTOURING_R_2, 90, 90)
            Line((0, -FINGER_BASE_CONTOURING_R_2), (0, 0))
            Line((0, 0), (FINGER_BASE_CONTOURING_R_2, 0))
        make_face()
    extrude(amount=12, mode=Mode.SUBTRACT)
    with BuildSketch(Plane(origin=(0, 0, -16), x_dir=(1, 0, 0), z_dir=(0, 0, 1))) as finger_base_contouring_2_piece_6:
        with BuildLine():
            CenterArc((FINGER_BASE_CONTOURING_R_3, FINGER_BASE_CONTOURING_R_3), FINGER_BASE_CONTOURING_R_3, 180, 90)
            Line((0, FINGER_BASE_CONTOURING_R_3), (0, 0))
            Line((0, 0), (FINGER_BASE_CONTOURING_R_3, 0))
        make_face()
    extrude(amount=32, mode=Mode.SUBTRACT)
    with BuildSketch(Plane(origin=(19.8, 0, -7), x_dir=(0, 1, 0), z_dir=(0, 0, 1)), Plane(origin=(19.8, 0, -16), x_dir=(0, 1, 0), z_dir=(0, 0, 1))) as finger_base_contouring_2_piece_7:
        with BuildLine():
            CenterArc((FINGER_BASE_CONTOURING_R_3, FINGER_BASE_CONTOURING_R_3), FINGER_BASE_CONTOURING_R_3, 180, 90)
            Line((0, FINGER_BASE_CONTOURING_R_3), (0, 0))
            Line((0, 0), (FINGER_BASE_CONTOURING_R_3, 0))
        make_face()
    extrude(amount=23, mode=Mode.SUBTRACT)


solid = part.part
